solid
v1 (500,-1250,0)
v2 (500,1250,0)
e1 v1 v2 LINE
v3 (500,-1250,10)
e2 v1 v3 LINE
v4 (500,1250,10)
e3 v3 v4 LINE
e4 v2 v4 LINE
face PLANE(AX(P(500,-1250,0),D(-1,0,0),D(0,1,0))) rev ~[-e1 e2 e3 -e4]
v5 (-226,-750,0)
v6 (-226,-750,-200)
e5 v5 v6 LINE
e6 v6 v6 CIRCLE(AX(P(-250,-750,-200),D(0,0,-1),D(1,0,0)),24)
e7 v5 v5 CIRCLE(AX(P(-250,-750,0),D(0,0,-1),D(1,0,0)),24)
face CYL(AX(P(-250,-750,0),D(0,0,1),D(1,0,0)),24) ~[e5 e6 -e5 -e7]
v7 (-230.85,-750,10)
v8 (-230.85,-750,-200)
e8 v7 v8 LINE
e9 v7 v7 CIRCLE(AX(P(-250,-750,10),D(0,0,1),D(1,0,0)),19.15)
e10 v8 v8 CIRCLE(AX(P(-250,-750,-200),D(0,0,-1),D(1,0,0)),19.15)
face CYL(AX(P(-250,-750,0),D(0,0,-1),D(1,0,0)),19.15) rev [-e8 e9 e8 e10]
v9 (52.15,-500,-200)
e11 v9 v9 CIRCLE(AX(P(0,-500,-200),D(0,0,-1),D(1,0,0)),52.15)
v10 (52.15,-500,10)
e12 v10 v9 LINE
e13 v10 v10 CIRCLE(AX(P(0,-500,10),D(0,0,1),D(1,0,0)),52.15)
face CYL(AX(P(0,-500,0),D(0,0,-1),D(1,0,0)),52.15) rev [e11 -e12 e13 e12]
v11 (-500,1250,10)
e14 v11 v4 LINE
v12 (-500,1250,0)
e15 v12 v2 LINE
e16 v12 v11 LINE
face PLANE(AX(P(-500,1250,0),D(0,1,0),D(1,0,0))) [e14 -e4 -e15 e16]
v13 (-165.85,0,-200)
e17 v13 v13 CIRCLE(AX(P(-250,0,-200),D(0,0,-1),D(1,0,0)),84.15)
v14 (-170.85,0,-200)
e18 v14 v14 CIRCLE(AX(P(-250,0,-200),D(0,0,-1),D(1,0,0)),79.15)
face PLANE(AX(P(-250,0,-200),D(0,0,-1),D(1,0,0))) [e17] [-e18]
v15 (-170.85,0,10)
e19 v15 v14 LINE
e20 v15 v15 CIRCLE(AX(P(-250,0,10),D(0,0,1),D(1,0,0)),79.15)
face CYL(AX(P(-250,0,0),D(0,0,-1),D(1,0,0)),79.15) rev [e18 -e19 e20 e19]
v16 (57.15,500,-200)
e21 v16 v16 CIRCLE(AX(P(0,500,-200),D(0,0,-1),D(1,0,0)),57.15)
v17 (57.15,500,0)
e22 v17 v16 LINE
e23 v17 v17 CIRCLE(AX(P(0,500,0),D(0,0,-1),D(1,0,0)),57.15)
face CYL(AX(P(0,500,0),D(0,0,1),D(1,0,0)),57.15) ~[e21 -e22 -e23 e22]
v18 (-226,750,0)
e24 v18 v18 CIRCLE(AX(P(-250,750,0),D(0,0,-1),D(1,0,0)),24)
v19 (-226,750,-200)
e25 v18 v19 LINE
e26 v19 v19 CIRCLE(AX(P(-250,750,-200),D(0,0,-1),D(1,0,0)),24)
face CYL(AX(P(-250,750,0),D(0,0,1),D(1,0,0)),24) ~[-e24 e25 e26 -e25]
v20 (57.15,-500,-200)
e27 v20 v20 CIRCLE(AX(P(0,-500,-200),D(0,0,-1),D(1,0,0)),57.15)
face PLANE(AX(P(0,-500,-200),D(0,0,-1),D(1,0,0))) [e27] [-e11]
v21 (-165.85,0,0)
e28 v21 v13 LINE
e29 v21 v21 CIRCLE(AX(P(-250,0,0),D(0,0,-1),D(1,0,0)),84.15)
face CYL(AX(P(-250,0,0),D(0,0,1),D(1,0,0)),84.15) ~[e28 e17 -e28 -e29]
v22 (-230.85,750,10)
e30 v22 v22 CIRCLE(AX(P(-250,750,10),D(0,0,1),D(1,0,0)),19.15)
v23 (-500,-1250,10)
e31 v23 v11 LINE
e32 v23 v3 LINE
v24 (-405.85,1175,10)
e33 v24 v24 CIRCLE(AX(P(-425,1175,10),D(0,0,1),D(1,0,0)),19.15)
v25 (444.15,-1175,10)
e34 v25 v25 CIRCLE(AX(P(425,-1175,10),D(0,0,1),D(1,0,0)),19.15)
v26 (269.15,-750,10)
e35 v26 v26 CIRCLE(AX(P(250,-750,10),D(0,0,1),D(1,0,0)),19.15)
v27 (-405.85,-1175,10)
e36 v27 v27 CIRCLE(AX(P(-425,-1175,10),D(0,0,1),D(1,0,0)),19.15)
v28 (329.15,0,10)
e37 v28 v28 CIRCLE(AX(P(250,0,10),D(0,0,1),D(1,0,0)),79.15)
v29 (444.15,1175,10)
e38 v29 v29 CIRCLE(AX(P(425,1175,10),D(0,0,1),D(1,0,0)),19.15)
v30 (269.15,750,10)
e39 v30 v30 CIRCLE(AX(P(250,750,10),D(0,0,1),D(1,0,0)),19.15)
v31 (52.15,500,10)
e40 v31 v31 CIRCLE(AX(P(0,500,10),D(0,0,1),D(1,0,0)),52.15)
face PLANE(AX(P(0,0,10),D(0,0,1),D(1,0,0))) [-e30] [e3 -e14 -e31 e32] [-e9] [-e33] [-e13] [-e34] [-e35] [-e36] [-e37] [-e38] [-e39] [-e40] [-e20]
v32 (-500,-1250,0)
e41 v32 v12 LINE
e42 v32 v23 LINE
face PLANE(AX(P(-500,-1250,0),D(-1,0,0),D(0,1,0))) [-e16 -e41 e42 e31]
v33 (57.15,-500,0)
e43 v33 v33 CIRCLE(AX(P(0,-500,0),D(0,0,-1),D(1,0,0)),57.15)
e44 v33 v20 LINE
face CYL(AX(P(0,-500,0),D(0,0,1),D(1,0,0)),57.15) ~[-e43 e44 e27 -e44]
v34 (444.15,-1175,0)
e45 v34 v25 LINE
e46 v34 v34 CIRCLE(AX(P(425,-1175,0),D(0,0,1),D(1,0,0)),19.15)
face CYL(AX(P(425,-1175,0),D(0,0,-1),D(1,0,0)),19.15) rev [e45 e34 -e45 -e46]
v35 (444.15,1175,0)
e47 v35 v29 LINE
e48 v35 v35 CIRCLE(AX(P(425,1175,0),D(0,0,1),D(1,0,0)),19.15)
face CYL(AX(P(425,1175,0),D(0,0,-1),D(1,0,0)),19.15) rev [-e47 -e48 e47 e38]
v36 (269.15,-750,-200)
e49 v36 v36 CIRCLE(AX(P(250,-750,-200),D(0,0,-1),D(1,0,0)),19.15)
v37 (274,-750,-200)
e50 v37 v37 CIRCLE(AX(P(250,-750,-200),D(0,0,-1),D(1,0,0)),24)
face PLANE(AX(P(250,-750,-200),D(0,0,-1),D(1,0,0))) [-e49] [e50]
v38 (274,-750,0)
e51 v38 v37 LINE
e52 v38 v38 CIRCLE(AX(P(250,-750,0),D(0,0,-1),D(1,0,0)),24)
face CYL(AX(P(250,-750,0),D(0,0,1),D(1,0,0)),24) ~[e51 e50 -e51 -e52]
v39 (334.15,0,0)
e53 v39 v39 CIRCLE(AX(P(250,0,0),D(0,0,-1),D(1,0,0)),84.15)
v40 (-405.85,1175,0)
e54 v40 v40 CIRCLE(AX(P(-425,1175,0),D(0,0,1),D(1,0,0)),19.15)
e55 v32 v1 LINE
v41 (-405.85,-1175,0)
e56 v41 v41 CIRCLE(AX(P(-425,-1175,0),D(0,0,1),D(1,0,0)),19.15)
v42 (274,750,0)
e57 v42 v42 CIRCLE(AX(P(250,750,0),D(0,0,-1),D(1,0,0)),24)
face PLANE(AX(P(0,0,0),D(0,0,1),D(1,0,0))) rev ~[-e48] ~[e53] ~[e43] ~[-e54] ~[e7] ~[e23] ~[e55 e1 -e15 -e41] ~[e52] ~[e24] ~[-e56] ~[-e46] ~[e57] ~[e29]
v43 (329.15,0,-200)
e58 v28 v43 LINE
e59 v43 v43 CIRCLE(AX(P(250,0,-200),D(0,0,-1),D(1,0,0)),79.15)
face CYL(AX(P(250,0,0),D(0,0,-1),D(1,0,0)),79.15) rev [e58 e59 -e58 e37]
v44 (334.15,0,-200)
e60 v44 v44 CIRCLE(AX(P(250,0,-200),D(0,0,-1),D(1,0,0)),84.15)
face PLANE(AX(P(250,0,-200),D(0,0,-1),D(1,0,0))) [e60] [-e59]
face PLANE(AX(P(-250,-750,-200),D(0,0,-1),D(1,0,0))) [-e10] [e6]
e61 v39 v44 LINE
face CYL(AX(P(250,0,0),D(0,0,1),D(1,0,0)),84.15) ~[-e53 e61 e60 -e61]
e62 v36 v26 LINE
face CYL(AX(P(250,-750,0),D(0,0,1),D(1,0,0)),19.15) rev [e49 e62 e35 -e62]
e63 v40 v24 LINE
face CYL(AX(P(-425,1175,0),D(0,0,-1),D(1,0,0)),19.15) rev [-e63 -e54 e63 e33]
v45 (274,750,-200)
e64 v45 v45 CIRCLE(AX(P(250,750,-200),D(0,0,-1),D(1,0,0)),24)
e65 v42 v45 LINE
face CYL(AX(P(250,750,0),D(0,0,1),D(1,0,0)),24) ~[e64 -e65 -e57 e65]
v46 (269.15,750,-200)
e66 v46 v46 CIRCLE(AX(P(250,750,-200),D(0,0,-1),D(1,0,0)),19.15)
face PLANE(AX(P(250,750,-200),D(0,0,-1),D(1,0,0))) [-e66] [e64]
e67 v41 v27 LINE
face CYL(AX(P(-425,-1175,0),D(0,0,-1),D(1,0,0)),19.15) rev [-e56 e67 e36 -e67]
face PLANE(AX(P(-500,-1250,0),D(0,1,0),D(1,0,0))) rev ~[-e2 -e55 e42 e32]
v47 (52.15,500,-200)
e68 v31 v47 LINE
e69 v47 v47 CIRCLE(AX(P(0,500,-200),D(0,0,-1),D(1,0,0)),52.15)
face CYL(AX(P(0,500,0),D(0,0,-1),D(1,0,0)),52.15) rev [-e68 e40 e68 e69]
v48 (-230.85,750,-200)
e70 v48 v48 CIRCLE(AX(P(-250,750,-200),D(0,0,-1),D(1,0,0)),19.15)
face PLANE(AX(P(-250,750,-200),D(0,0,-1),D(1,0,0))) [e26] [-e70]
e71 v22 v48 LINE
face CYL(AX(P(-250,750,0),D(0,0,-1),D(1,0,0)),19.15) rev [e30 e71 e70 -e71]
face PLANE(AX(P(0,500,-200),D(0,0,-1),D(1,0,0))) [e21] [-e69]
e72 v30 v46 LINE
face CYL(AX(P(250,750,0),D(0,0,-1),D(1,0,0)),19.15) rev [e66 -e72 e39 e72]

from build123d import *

# Parameters (mm, degrees)
F0_W     = 1000
F0_H     = 2500
F0_R     = 19.15
F0_R_2   = 52.15
F0_R_3   = 79.15
F1_DEPTH = 10
F2_R     = 24
F2_R_2   = 19.15
F2_R_3   = 57.15
F2_R_4   = 52.15
F2_R_5   = 84.15
F2_R_6   = 79.15
F3_DEPTH = 200


with BuildPart() as f1:
    # F0 (on Top) → F1 (new body)
    with BuildSketch(Plane.XY):
        Rectangle(F0_W, F0_H)
        with Locations((-425, -1175)):
            Circle(F0_R, mode=Mode.SUBTRACT)
        with Locations((-250, -750)):
            Circle(F0_R, mode=Mode.SUBTRACT)
        with Locations((425, -1175)):
            Circle(F0_R, mode=Mode.SUBTRACT)
        with Locations((250, -750)):
            Circle(F0_R, mode=Mode.SUBTRACT)
        with Locations((0, -500)):
            Circle(F0_R_2, mode=Mode.SUBTRACT)
        with Locations((-250, 0)):
            Circle(F0_R_3, mode=Mode.SUBTRACT)
        with Locations((-425, 1175)):
            Circle(F0_R, mode=Mode.SUBTRACT)
        with Locations((-250, 750)):
            Circle(F0_R, mode=Mode.SUBTRACT)
        with Locations((0, 500)):
            Circle(F0_R_2, mode=Mode.SUBTRACT)
        with Locations((250, 0)):
            Circle(F0_R_3, mode=Mode.SUBTRACT)
        with Locations((250, 750)):
            Circle(F0_R, mode=Mode.SUBTRACT)
        with Locations((425, 1175)):
            Circle(F0_R, mode=Mode.SUBTRACT)
    extrude(amount=F1_DEPTH)

    # F2 (on face) → F3 (join)
    with BuildSketch(Plane(origin=(0, 0, 0), x_dir=(1, 0, 0), z_dir=(0, 0, -1))):
        with Locations((250, 750)):
            Circle(F2_R)
        with Locations((250, 750)):
            Circle(F2_R_2, mode=Mode.SUBTRACT)
        with Locations((-250, 750)):
            Circle(F2_R)
        with Locations((-250, 750)):
            Circle(F2_R_2, mode=Mode.SUBTRACT)
        with Locations((0, 500)):
            Circle(F2_R_3)
        with Locations((0, 500)):
            Circle(F2_R_4, mode=Mode.SUBTRACT)
        with Locations((250, 0)):
            Circle(F2_R_5)
        with Locations((250, 0)):
            Circle(F2_R_6, mode=Mode.SUBTRACT)
        with Locations((0, -500)):
            Circle(F2_R_3)
        with Locations((0, -500)):
            Circle(F2_R_4, mode=Mode.SUBTRACT)
        with Locations((250, -750)):
            Circle(F2_R)
        with Locations((250, -750)):
            Circle(F2_R_2, mode=Mode.SUBTRACT)
        with Locations((-250, -750)):
            Circle(F2_R)
        with Locations((-250, -750)):
            Circle(F2_R_2, mode=Mode.SUBTRACT)
        with Locations((-250, 0)):
            Circle(F2_R_5)
        with Locations((-250, 0)):
            Circle(F2_R_6, mode=Mode.SUBTRACT)
    extrude(amount=F3_DEPTH)


solid = f1.part
